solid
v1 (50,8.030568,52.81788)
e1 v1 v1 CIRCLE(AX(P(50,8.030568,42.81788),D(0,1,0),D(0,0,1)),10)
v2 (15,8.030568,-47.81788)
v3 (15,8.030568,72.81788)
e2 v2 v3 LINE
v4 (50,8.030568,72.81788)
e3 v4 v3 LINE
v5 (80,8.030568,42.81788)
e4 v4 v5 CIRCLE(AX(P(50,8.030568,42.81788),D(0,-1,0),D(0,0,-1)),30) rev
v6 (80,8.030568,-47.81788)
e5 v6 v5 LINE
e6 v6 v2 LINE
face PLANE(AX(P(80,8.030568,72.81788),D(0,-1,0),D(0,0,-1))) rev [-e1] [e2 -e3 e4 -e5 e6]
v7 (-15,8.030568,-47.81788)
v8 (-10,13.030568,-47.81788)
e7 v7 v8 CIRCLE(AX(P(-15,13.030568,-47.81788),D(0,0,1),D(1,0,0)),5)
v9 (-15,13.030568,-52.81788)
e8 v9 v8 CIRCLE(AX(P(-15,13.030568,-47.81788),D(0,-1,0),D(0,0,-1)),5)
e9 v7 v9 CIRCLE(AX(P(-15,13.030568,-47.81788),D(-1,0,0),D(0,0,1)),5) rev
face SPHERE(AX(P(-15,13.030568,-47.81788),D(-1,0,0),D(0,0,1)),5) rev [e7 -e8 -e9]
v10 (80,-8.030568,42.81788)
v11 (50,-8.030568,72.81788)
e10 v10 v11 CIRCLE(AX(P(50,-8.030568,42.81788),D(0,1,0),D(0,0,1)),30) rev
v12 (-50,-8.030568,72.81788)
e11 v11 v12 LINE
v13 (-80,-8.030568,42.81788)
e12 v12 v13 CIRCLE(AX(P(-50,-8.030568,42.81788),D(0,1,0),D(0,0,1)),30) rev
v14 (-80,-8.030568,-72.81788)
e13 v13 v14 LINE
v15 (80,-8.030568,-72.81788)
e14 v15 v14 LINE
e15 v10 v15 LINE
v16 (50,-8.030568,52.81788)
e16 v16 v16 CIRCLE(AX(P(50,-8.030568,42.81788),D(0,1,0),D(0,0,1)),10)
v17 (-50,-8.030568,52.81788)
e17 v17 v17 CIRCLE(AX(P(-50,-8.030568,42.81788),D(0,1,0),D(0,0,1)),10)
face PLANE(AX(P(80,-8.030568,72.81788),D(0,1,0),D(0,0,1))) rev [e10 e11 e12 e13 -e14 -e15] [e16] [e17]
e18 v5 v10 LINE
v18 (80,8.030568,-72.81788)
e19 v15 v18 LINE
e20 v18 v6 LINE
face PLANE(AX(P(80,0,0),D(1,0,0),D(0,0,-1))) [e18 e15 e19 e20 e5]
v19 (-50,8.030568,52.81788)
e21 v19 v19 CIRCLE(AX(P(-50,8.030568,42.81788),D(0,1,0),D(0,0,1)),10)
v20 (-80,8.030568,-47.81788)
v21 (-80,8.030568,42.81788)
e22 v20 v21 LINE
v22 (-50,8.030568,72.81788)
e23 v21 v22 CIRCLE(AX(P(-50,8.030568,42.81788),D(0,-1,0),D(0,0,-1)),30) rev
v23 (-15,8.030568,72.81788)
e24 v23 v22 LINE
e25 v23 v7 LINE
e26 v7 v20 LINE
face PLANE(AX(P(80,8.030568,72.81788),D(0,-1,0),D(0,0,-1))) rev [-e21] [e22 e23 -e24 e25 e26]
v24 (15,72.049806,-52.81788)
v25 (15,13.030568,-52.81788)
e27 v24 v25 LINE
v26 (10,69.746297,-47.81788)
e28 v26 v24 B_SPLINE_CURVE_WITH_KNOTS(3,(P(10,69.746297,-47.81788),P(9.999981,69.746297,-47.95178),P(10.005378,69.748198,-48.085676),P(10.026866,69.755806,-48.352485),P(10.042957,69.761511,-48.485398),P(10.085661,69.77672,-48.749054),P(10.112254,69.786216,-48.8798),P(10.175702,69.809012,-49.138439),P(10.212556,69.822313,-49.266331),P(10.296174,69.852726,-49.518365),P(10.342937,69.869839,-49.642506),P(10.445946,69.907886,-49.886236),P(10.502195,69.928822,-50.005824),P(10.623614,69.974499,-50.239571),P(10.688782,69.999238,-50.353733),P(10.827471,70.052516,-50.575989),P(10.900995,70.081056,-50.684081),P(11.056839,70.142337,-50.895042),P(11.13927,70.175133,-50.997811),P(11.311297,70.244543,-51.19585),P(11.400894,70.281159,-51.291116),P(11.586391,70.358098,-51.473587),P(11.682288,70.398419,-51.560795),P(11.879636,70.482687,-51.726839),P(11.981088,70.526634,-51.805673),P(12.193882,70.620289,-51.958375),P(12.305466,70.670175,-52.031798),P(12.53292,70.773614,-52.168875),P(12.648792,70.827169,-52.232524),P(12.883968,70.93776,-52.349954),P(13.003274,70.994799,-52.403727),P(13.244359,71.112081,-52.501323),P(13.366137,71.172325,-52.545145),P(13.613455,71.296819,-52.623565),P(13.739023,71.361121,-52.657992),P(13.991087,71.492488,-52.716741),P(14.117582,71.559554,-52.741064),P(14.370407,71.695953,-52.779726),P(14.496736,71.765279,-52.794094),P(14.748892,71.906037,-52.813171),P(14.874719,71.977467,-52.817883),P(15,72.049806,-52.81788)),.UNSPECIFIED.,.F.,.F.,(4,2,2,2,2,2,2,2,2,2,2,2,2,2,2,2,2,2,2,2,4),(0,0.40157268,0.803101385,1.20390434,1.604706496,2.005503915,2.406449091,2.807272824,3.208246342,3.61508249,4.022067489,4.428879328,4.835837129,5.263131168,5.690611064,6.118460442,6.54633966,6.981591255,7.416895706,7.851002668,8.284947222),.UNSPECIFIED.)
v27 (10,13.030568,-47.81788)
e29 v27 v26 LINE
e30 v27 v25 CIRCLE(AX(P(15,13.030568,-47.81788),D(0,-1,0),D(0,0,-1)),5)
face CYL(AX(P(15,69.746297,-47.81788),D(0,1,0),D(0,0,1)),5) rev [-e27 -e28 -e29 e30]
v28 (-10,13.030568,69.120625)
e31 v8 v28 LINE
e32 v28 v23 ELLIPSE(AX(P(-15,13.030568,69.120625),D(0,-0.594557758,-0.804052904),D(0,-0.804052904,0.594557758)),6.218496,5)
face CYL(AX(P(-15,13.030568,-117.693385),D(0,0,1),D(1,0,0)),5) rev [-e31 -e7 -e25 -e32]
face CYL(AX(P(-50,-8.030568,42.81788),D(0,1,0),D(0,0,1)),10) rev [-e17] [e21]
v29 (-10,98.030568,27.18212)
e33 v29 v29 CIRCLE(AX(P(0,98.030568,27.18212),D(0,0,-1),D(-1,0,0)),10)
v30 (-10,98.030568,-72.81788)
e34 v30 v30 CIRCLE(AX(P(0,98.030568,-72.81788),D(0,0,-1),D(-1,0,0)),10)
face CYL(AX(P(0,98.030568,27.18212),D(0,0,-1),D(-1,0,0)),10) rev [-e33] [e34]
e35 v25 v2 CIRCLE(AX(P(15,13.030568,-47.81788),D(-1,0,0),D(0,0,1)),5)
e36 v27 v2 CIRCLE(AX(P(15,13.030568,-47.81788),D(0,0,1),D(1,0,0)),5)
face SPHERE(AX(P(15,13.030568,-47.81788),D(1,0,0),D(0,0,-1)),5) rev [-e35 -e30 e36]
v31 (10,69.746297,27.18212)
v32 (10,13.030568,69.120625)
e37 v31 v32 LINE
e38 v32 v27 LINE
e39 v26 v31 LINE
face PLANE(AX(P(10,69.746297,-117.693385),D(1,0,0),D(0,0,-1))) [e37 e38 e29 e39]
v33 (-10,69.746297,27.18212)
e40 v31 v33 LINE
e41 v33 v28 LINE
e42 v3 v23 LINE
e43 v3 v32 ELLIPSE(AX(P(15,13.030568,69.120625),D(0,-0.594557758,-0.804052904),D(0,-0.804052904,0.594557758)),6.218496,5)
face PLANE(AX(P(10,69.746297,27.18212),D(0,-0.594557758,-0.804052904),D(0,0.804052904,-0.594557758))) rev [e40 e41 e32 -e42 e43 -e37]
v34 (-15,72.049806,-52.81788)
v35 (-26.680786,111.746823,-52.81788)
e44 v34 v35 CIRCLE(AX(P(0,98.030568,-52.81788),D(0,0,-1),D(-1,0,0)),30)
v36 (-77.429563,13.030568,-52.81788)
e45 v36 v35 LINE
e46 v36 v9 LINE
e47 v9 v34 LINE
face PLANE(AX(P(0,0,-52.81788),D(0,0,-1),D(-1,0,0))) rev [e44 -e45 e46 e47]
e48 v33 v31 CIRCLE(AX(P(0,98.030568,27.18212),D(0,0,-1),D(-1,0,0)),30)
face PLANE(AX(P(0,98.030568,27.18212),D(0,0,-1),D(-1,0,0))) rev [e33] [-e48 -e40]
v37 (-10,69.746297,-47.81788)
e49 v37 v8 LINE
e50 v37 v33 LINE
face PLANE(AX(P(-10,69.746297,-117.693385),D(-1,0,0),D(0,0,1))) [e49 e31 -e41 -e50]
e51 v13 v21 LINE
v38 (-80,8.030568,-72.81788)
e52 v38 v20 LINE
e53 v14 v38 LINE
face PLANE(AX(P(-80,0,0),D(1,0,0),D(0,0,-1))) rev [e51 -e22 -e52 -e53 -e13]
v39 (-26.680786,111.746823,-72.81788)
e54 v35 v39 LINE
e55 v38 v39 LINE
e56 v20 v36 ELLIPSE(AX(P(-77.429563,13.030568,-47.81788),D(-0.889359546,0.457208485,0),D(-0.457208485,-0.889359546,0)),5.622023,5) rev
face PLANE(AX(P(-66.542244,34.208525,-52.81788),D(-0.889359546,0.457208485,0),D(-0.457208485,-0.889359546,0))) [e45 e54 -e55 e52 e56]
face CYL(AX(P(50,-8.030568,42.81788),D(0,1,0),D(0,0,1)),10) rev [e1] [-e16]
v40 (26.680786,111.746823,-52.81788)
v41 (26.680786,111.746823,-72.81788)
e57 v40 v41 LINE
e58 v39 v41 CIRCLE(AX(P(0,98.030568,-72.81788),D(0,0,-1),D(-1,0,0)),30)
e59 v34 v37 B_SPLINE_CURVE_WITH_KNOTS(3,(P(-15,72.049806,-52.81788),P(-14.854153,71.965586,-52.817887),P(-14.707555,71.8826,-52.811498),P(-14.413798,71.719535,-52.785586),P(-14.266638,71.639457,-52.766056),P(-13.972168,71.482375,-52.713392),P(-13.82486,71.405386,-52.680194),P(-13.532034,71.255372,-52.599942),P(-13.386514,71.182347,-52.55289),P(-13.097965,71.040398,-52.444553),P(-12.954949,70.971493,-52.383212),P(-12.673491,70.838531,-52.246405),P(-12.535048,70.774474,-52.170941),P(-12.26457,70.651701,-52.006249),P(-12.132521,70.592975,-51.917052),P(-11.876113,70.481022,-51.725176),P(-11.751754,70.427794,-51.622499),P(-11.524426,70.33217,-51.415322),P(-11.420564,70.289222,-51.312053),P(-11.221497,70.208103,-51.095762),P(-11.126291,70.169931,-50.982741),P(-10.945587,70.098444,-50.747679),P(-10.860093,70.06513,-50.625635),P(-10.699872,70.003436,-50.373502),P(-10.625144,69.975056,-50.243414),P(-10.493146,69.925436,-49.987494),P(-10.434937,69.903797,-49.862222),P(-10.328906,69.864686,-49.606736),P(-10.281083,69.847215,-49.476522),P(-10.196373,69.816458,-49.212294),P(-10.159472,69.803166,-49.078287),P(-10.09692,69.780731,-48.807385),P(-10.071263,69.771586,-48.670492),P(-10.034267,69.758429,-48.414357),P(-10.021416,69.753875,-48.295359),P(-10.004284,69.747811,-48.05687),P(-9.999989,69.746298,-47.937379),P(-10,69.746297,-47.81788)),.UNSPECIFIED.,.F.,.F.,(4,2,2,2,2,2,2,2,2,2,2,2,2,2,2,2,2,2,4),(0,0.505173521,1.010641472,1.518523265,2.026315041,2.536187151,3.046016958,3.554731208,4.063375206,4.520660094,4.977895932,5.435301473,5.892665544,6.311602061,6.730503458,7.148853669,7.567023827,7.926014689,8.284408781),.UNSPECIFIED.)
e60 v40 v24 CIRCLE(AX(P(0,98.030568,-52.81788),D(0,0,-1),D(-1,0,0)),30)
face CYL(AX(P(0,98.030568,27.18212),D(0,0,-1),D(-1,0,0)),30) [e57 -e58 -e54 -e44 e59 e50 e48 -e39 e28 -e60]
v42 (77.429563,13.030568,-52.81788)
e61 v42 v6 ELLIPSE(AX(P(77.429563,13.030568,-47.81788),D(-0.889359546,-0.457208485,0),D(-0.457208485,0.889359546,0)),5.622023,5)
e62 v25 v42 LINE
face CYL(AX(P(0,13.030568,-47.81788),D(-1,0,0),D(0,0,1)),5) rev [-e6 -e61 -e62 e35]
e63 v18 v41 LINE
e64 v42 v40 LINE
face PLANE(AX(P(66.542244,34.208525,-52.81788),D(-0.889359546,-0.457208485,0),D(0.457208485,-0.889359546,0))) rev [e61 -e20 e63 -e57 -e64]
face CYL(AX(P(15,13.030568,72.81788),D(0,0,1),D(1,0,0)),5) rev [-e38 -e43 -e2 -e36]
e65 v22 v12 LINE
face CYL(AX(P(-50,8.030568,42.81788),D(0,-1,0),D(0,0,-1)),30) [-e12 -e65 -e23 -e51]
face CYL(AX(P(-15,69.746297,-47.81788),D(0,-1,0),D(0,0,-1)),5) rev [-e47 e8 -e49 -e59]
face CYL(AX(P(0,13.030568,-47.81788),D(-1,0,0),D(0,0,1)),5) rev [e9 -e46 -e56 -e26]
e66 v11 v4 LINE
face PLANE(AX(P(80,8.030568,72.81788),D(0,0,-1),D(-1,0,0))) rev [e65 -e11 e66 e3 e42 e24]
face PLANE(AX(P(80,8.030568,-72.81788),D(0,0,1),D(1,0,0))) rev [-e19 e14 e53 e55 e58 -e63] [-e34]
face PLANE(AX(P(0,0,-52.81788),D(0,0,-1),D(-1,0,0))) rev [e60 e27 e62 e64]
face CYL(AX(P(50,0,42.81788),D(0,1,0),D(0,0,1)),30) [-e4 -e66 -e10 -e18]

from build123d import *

# Parameters (mm, degrees)
SKETCH2_W            = 145.63575991
SKETCH2_H            = 16.06113598
BOSS_EXTRUDE1_DEPTH  = 80
SKETCH3_R            = 10
CUT_EXTRUDE1_DEPTH   = 110.363630747
BOSS_EXTRUDE2_DEPTH  = 20
SKETCH5_R            = 30
SKETCH5_R_2          = 10
BOSS_EXTRUDE3_DEPTH  = 100
FILLET1_R            = 5
BOSS_EXTRUDE9_REACH  = 183.085
BOSS_EXTRUDE10_DEPTH = 10
FILLET2_R            = 5
FILLET3_R            = 30


with BuildPart() as part:
    # Sketch2 → Boss-Extrude1 (new, symmetric)
    with BuildSketch(Plane(origin=(0, 0, 0), x_dir=(0, 0, -1), z_dir=(1, 0, 0))):
        Rectangle(SKETCH2_W, SKETCH2_H)
    extrude(amount=BOSS_EXTRUDE1_DEPTH, both=True)

    # Sketch3 → Cut-Extrude1 (cut, through all)
    with BuildSketch(Plane(origin=(0, 8.03056799, 0), x_dir=(1, 0, 0), z_dir=(0, 1, 0))):
        with Locations(Location((50, -42.817879955, 0), (0, 0, 270))):
            Circle(SKETCH3_R)
        with Locations(Location((-50, -42.817879955, 0), (0, 0, 270))):
            Circle(SKETCH3_R)
    extrude(amount=-CUT_EXTRUDE1_DEPTH, mode=Mode.SUBTRACT)

    # Sketch4 → Boss-Extrude2 (add)
    with BuildSketch(Plane(origin=(0, 0, -72.817879955), x_dir=(-1, 0, 0), z_dir=(0, 0, -1))):
        with BuildLine():
            Line((-26.680786367, 111.746822538), (-80, 8.03056799))
            Line((-80, 8.03056799), (80, 8.03056799))
            Line((80, 8.03056799), (26.680786367, 111.746822538))
            ThreePointArc((26.680786367, 111.746822538), (29.158391511, 105.086643705), (30, 98.03056799))
            ThreePointArc((30, 98.03056799), (-7.056075715, 68.872176479), (-26.680786367, 111.746822538))
        make_face()
    extrude(amount=-BOSS_EXTRUDE2_DEPTH)

    # Sketch5 → Boss-Extrude3 (add)
    with BuildSketch(Plane(origin=(0, 0, -72.817879955), x_dir=(-1, 0, 0), z_dir=(0, 0, -1))):
        with Locations((0, 98.03056799)):
            Circle(SKETCH5_R)
        with Locations((0, 98.03056799)):
            Circle(SKETCH5_R_2, mode=Mode.SUBTRACT)
    extrude(amount=-BOSS_EXTRUDE3_DEPTH)

    # Fillet1
    fillet1_edges = [part.edges().sort_by_distance(p)[0] for p in [
        (0, 8.03056799, -52.817879955),
    ]]
    fillet(fillet1_edges, radius=FILLET1_R)

    # Boss-Extrude9: up to this face of the body (flat: up to its plane)
    boss_extrude9_end = Plane(part.part.faces().sort_by_distance((0, 43.997298741, -52.817879955))[0])
    # Sketch12 → Boss-Extrude9 (add, up to the picked face)
    with BuildSketch(Plane.XY.offset(27.182120045), mode=Mode.PRIVATE) as boss_extrude9_sk1:
        with BuildLine():
            Line((10, 69.746296743), (10, 8.03056799))
            Line((10, 8.03056799), (-10, 8.03056799))
            Line((-10, 8.03056799), (-10, 69.746296743))
            ThreePointArc((-10, 69.746296743), (0, 68.03056799), (10, 69.746296743))
        make_face()
    boss_extrude9_tool1 = split(extrude(boss_extrude9_sk1.sketch, amount=-BOSS_EXTRUDE9_REACH, mode=Mode.PRIVATE), bisect_by=boss_extrude9_end, keep=Keep.BOTH, mode=Mode.PRIVATE)
    add(boss_extrude9_tool1.solids().sort_by(Axis((0, 38.315311, 27.18212), (0, 0, -1)))[0])

    # Sketch14 → Boss-Extrude10 (add, symmetric)
    with BuildSketch(Plane(origin=(0, 0, 0), x_dir=(0, 0, -1), z_dir=(1, 0, 0))):
        Polygon((-27.182120045, 69.746296743), (-72.817879955, 8.03056799), (-27.182120045, 8.03056799), align=None)
    extrude(amount=BOSS_EXTRUDE10_DEPTH, both=True)

    # Fillet2
    # the kernel refuses this fillet: 5 mm, written as the material it adds along each edge
    with BuildSketch(Plane(origin=(10, 13.03056799, -47.817879955), x_dir=(0, 0, -1), z_dir=(0, 1, 0))) as fillet2_piece_1:
        with BuildLine():
            CenterArc((5 - FILLET2_R, -FILLET2_R), FILLET2_R, 0, 90)
            Line((5, -FILLET2_R), (5, 0))
            Line((5, 0), (5 - FILLET2_R, 0))
        make_face()
    revolve(axis=Axis((10, 13.03056799, -47.817879955), (-1, 0, 0)), revolution_arc=90)
    with BuildSketch(Plane(origin=(-10, 13.03056799, -47.817879955), x_dir=(0, 0, -1), z_dir=(0, 1, 0))) as fillet2_piece_2:
        with BuildLine():
            CenterArc((5 - FILLET2_R, FILLET2_R), FILLET2_R, 270, 90)
            Line((5, FILLET2_R), (5, 0))
            Line((5, 0), (5 - FILLET2_R, 0))
        make_face()
    revolve(axis=Axis((-10, 13.03056799, -47.817879955), (-1, 0, 0)), revolution_arc=90)
    with BuildSketch(Plane(origin=(-10, 8.03056799, 72.817879955), x_dir=(-1, 0, 0), z_dir=(0, 0, -1))) as fillet2_piece_3_section:
        with BuildLine():
            CenterArc((FILLET2_R, FILLET2_R), FILLET2_R, 180, 90)
            Line((0, FILLET2_R), (0, 0))
            Line((0, 0), (FILLET2_R, 0))
        make_face()
    fillet2_piece_3 = extrude(amount=120.63575991, mode=Mode.PRIVATE)
    fillet2_piece_3 = split(fillet2_piece_3, bisect_by=Plane(origin=(-10, 8.03056799, 72.817879955), z_dir=(0, -0.5945577575874679, -0.8040529042871258)), keep=Keep.TOP, mode=Mode.PRIVATE)
    add(fillet2_piece_3)
    with BuildSketch(Plane(origin=(-10, 82.246296743, -52.817879955), x_dir=(0, 0, 1), z_dir=(0, -1, 0))) as fillet2_piece_4:
        with BuildLine():
            CenterArc((FILLET2_R, FILLET2_R), FILLET2_R, 180, 90)
            Line((0, FILLET2_R), (0, 0))
            Line((0, 0), (FILLET2_R, 0))
        make_face()
    extrude(amount=69.215728753)
    with BuildSketch(Plane(origin=(10, 13.03056799, -52.817879955), x_dir=(1, 0, 0), z_dir=(0, 1, 0))) as fillet2_piece_5:
        with BuildLine():
            CenterArc((FILLET2_R, -FILLET2_R), FILLET2_R, 90, 90)
            Line((0, -FILLET2_R), (0, 0))
            Line((0, 0), (FILLET2_R, 0))
        make_face()
    extrude(amount=69.215728753)
    with BuildSketch(Plane(origin=(10, 8.03056799, -47.817879955), x_dir=(1, 0, 0), z_dir=(0, 0, 1))) as fillet2_piece_6_section:
        with BuildLine():
            CenterArc((FILLET2_R, FILLET2_R), FILLET2_R, 180, 90)
            Line((0, FILLET2_R), (0, 0))
            Line((0, 0), (FILLET2_R, 0))
        make_face()
    fillet2_piece_6 = extrude(amount=120.63575991, mode=Mode.PRIVATE)
    fillet2_piece_6 = split(fillet2_piece_6, bisect_by=Plane(origin=(10, 65.701203771, 30.173268256), z_dir=(0, -0.5945577575874679, -0.8040529042871258)), keep=Keep.TOP, mode=Mode.PRIVATE)
    add(fillet2_piece_6)

    # Fillet3
    fillet3_edges = [part.edges().sort_by_distance(p)[0] for p in [
        (80, 0, 72.817879955),
        (-80, 0, 72.817879955),
    ]]
    fillet(fillet3_edges, radius=FILLET3_R)


solid = part.part
